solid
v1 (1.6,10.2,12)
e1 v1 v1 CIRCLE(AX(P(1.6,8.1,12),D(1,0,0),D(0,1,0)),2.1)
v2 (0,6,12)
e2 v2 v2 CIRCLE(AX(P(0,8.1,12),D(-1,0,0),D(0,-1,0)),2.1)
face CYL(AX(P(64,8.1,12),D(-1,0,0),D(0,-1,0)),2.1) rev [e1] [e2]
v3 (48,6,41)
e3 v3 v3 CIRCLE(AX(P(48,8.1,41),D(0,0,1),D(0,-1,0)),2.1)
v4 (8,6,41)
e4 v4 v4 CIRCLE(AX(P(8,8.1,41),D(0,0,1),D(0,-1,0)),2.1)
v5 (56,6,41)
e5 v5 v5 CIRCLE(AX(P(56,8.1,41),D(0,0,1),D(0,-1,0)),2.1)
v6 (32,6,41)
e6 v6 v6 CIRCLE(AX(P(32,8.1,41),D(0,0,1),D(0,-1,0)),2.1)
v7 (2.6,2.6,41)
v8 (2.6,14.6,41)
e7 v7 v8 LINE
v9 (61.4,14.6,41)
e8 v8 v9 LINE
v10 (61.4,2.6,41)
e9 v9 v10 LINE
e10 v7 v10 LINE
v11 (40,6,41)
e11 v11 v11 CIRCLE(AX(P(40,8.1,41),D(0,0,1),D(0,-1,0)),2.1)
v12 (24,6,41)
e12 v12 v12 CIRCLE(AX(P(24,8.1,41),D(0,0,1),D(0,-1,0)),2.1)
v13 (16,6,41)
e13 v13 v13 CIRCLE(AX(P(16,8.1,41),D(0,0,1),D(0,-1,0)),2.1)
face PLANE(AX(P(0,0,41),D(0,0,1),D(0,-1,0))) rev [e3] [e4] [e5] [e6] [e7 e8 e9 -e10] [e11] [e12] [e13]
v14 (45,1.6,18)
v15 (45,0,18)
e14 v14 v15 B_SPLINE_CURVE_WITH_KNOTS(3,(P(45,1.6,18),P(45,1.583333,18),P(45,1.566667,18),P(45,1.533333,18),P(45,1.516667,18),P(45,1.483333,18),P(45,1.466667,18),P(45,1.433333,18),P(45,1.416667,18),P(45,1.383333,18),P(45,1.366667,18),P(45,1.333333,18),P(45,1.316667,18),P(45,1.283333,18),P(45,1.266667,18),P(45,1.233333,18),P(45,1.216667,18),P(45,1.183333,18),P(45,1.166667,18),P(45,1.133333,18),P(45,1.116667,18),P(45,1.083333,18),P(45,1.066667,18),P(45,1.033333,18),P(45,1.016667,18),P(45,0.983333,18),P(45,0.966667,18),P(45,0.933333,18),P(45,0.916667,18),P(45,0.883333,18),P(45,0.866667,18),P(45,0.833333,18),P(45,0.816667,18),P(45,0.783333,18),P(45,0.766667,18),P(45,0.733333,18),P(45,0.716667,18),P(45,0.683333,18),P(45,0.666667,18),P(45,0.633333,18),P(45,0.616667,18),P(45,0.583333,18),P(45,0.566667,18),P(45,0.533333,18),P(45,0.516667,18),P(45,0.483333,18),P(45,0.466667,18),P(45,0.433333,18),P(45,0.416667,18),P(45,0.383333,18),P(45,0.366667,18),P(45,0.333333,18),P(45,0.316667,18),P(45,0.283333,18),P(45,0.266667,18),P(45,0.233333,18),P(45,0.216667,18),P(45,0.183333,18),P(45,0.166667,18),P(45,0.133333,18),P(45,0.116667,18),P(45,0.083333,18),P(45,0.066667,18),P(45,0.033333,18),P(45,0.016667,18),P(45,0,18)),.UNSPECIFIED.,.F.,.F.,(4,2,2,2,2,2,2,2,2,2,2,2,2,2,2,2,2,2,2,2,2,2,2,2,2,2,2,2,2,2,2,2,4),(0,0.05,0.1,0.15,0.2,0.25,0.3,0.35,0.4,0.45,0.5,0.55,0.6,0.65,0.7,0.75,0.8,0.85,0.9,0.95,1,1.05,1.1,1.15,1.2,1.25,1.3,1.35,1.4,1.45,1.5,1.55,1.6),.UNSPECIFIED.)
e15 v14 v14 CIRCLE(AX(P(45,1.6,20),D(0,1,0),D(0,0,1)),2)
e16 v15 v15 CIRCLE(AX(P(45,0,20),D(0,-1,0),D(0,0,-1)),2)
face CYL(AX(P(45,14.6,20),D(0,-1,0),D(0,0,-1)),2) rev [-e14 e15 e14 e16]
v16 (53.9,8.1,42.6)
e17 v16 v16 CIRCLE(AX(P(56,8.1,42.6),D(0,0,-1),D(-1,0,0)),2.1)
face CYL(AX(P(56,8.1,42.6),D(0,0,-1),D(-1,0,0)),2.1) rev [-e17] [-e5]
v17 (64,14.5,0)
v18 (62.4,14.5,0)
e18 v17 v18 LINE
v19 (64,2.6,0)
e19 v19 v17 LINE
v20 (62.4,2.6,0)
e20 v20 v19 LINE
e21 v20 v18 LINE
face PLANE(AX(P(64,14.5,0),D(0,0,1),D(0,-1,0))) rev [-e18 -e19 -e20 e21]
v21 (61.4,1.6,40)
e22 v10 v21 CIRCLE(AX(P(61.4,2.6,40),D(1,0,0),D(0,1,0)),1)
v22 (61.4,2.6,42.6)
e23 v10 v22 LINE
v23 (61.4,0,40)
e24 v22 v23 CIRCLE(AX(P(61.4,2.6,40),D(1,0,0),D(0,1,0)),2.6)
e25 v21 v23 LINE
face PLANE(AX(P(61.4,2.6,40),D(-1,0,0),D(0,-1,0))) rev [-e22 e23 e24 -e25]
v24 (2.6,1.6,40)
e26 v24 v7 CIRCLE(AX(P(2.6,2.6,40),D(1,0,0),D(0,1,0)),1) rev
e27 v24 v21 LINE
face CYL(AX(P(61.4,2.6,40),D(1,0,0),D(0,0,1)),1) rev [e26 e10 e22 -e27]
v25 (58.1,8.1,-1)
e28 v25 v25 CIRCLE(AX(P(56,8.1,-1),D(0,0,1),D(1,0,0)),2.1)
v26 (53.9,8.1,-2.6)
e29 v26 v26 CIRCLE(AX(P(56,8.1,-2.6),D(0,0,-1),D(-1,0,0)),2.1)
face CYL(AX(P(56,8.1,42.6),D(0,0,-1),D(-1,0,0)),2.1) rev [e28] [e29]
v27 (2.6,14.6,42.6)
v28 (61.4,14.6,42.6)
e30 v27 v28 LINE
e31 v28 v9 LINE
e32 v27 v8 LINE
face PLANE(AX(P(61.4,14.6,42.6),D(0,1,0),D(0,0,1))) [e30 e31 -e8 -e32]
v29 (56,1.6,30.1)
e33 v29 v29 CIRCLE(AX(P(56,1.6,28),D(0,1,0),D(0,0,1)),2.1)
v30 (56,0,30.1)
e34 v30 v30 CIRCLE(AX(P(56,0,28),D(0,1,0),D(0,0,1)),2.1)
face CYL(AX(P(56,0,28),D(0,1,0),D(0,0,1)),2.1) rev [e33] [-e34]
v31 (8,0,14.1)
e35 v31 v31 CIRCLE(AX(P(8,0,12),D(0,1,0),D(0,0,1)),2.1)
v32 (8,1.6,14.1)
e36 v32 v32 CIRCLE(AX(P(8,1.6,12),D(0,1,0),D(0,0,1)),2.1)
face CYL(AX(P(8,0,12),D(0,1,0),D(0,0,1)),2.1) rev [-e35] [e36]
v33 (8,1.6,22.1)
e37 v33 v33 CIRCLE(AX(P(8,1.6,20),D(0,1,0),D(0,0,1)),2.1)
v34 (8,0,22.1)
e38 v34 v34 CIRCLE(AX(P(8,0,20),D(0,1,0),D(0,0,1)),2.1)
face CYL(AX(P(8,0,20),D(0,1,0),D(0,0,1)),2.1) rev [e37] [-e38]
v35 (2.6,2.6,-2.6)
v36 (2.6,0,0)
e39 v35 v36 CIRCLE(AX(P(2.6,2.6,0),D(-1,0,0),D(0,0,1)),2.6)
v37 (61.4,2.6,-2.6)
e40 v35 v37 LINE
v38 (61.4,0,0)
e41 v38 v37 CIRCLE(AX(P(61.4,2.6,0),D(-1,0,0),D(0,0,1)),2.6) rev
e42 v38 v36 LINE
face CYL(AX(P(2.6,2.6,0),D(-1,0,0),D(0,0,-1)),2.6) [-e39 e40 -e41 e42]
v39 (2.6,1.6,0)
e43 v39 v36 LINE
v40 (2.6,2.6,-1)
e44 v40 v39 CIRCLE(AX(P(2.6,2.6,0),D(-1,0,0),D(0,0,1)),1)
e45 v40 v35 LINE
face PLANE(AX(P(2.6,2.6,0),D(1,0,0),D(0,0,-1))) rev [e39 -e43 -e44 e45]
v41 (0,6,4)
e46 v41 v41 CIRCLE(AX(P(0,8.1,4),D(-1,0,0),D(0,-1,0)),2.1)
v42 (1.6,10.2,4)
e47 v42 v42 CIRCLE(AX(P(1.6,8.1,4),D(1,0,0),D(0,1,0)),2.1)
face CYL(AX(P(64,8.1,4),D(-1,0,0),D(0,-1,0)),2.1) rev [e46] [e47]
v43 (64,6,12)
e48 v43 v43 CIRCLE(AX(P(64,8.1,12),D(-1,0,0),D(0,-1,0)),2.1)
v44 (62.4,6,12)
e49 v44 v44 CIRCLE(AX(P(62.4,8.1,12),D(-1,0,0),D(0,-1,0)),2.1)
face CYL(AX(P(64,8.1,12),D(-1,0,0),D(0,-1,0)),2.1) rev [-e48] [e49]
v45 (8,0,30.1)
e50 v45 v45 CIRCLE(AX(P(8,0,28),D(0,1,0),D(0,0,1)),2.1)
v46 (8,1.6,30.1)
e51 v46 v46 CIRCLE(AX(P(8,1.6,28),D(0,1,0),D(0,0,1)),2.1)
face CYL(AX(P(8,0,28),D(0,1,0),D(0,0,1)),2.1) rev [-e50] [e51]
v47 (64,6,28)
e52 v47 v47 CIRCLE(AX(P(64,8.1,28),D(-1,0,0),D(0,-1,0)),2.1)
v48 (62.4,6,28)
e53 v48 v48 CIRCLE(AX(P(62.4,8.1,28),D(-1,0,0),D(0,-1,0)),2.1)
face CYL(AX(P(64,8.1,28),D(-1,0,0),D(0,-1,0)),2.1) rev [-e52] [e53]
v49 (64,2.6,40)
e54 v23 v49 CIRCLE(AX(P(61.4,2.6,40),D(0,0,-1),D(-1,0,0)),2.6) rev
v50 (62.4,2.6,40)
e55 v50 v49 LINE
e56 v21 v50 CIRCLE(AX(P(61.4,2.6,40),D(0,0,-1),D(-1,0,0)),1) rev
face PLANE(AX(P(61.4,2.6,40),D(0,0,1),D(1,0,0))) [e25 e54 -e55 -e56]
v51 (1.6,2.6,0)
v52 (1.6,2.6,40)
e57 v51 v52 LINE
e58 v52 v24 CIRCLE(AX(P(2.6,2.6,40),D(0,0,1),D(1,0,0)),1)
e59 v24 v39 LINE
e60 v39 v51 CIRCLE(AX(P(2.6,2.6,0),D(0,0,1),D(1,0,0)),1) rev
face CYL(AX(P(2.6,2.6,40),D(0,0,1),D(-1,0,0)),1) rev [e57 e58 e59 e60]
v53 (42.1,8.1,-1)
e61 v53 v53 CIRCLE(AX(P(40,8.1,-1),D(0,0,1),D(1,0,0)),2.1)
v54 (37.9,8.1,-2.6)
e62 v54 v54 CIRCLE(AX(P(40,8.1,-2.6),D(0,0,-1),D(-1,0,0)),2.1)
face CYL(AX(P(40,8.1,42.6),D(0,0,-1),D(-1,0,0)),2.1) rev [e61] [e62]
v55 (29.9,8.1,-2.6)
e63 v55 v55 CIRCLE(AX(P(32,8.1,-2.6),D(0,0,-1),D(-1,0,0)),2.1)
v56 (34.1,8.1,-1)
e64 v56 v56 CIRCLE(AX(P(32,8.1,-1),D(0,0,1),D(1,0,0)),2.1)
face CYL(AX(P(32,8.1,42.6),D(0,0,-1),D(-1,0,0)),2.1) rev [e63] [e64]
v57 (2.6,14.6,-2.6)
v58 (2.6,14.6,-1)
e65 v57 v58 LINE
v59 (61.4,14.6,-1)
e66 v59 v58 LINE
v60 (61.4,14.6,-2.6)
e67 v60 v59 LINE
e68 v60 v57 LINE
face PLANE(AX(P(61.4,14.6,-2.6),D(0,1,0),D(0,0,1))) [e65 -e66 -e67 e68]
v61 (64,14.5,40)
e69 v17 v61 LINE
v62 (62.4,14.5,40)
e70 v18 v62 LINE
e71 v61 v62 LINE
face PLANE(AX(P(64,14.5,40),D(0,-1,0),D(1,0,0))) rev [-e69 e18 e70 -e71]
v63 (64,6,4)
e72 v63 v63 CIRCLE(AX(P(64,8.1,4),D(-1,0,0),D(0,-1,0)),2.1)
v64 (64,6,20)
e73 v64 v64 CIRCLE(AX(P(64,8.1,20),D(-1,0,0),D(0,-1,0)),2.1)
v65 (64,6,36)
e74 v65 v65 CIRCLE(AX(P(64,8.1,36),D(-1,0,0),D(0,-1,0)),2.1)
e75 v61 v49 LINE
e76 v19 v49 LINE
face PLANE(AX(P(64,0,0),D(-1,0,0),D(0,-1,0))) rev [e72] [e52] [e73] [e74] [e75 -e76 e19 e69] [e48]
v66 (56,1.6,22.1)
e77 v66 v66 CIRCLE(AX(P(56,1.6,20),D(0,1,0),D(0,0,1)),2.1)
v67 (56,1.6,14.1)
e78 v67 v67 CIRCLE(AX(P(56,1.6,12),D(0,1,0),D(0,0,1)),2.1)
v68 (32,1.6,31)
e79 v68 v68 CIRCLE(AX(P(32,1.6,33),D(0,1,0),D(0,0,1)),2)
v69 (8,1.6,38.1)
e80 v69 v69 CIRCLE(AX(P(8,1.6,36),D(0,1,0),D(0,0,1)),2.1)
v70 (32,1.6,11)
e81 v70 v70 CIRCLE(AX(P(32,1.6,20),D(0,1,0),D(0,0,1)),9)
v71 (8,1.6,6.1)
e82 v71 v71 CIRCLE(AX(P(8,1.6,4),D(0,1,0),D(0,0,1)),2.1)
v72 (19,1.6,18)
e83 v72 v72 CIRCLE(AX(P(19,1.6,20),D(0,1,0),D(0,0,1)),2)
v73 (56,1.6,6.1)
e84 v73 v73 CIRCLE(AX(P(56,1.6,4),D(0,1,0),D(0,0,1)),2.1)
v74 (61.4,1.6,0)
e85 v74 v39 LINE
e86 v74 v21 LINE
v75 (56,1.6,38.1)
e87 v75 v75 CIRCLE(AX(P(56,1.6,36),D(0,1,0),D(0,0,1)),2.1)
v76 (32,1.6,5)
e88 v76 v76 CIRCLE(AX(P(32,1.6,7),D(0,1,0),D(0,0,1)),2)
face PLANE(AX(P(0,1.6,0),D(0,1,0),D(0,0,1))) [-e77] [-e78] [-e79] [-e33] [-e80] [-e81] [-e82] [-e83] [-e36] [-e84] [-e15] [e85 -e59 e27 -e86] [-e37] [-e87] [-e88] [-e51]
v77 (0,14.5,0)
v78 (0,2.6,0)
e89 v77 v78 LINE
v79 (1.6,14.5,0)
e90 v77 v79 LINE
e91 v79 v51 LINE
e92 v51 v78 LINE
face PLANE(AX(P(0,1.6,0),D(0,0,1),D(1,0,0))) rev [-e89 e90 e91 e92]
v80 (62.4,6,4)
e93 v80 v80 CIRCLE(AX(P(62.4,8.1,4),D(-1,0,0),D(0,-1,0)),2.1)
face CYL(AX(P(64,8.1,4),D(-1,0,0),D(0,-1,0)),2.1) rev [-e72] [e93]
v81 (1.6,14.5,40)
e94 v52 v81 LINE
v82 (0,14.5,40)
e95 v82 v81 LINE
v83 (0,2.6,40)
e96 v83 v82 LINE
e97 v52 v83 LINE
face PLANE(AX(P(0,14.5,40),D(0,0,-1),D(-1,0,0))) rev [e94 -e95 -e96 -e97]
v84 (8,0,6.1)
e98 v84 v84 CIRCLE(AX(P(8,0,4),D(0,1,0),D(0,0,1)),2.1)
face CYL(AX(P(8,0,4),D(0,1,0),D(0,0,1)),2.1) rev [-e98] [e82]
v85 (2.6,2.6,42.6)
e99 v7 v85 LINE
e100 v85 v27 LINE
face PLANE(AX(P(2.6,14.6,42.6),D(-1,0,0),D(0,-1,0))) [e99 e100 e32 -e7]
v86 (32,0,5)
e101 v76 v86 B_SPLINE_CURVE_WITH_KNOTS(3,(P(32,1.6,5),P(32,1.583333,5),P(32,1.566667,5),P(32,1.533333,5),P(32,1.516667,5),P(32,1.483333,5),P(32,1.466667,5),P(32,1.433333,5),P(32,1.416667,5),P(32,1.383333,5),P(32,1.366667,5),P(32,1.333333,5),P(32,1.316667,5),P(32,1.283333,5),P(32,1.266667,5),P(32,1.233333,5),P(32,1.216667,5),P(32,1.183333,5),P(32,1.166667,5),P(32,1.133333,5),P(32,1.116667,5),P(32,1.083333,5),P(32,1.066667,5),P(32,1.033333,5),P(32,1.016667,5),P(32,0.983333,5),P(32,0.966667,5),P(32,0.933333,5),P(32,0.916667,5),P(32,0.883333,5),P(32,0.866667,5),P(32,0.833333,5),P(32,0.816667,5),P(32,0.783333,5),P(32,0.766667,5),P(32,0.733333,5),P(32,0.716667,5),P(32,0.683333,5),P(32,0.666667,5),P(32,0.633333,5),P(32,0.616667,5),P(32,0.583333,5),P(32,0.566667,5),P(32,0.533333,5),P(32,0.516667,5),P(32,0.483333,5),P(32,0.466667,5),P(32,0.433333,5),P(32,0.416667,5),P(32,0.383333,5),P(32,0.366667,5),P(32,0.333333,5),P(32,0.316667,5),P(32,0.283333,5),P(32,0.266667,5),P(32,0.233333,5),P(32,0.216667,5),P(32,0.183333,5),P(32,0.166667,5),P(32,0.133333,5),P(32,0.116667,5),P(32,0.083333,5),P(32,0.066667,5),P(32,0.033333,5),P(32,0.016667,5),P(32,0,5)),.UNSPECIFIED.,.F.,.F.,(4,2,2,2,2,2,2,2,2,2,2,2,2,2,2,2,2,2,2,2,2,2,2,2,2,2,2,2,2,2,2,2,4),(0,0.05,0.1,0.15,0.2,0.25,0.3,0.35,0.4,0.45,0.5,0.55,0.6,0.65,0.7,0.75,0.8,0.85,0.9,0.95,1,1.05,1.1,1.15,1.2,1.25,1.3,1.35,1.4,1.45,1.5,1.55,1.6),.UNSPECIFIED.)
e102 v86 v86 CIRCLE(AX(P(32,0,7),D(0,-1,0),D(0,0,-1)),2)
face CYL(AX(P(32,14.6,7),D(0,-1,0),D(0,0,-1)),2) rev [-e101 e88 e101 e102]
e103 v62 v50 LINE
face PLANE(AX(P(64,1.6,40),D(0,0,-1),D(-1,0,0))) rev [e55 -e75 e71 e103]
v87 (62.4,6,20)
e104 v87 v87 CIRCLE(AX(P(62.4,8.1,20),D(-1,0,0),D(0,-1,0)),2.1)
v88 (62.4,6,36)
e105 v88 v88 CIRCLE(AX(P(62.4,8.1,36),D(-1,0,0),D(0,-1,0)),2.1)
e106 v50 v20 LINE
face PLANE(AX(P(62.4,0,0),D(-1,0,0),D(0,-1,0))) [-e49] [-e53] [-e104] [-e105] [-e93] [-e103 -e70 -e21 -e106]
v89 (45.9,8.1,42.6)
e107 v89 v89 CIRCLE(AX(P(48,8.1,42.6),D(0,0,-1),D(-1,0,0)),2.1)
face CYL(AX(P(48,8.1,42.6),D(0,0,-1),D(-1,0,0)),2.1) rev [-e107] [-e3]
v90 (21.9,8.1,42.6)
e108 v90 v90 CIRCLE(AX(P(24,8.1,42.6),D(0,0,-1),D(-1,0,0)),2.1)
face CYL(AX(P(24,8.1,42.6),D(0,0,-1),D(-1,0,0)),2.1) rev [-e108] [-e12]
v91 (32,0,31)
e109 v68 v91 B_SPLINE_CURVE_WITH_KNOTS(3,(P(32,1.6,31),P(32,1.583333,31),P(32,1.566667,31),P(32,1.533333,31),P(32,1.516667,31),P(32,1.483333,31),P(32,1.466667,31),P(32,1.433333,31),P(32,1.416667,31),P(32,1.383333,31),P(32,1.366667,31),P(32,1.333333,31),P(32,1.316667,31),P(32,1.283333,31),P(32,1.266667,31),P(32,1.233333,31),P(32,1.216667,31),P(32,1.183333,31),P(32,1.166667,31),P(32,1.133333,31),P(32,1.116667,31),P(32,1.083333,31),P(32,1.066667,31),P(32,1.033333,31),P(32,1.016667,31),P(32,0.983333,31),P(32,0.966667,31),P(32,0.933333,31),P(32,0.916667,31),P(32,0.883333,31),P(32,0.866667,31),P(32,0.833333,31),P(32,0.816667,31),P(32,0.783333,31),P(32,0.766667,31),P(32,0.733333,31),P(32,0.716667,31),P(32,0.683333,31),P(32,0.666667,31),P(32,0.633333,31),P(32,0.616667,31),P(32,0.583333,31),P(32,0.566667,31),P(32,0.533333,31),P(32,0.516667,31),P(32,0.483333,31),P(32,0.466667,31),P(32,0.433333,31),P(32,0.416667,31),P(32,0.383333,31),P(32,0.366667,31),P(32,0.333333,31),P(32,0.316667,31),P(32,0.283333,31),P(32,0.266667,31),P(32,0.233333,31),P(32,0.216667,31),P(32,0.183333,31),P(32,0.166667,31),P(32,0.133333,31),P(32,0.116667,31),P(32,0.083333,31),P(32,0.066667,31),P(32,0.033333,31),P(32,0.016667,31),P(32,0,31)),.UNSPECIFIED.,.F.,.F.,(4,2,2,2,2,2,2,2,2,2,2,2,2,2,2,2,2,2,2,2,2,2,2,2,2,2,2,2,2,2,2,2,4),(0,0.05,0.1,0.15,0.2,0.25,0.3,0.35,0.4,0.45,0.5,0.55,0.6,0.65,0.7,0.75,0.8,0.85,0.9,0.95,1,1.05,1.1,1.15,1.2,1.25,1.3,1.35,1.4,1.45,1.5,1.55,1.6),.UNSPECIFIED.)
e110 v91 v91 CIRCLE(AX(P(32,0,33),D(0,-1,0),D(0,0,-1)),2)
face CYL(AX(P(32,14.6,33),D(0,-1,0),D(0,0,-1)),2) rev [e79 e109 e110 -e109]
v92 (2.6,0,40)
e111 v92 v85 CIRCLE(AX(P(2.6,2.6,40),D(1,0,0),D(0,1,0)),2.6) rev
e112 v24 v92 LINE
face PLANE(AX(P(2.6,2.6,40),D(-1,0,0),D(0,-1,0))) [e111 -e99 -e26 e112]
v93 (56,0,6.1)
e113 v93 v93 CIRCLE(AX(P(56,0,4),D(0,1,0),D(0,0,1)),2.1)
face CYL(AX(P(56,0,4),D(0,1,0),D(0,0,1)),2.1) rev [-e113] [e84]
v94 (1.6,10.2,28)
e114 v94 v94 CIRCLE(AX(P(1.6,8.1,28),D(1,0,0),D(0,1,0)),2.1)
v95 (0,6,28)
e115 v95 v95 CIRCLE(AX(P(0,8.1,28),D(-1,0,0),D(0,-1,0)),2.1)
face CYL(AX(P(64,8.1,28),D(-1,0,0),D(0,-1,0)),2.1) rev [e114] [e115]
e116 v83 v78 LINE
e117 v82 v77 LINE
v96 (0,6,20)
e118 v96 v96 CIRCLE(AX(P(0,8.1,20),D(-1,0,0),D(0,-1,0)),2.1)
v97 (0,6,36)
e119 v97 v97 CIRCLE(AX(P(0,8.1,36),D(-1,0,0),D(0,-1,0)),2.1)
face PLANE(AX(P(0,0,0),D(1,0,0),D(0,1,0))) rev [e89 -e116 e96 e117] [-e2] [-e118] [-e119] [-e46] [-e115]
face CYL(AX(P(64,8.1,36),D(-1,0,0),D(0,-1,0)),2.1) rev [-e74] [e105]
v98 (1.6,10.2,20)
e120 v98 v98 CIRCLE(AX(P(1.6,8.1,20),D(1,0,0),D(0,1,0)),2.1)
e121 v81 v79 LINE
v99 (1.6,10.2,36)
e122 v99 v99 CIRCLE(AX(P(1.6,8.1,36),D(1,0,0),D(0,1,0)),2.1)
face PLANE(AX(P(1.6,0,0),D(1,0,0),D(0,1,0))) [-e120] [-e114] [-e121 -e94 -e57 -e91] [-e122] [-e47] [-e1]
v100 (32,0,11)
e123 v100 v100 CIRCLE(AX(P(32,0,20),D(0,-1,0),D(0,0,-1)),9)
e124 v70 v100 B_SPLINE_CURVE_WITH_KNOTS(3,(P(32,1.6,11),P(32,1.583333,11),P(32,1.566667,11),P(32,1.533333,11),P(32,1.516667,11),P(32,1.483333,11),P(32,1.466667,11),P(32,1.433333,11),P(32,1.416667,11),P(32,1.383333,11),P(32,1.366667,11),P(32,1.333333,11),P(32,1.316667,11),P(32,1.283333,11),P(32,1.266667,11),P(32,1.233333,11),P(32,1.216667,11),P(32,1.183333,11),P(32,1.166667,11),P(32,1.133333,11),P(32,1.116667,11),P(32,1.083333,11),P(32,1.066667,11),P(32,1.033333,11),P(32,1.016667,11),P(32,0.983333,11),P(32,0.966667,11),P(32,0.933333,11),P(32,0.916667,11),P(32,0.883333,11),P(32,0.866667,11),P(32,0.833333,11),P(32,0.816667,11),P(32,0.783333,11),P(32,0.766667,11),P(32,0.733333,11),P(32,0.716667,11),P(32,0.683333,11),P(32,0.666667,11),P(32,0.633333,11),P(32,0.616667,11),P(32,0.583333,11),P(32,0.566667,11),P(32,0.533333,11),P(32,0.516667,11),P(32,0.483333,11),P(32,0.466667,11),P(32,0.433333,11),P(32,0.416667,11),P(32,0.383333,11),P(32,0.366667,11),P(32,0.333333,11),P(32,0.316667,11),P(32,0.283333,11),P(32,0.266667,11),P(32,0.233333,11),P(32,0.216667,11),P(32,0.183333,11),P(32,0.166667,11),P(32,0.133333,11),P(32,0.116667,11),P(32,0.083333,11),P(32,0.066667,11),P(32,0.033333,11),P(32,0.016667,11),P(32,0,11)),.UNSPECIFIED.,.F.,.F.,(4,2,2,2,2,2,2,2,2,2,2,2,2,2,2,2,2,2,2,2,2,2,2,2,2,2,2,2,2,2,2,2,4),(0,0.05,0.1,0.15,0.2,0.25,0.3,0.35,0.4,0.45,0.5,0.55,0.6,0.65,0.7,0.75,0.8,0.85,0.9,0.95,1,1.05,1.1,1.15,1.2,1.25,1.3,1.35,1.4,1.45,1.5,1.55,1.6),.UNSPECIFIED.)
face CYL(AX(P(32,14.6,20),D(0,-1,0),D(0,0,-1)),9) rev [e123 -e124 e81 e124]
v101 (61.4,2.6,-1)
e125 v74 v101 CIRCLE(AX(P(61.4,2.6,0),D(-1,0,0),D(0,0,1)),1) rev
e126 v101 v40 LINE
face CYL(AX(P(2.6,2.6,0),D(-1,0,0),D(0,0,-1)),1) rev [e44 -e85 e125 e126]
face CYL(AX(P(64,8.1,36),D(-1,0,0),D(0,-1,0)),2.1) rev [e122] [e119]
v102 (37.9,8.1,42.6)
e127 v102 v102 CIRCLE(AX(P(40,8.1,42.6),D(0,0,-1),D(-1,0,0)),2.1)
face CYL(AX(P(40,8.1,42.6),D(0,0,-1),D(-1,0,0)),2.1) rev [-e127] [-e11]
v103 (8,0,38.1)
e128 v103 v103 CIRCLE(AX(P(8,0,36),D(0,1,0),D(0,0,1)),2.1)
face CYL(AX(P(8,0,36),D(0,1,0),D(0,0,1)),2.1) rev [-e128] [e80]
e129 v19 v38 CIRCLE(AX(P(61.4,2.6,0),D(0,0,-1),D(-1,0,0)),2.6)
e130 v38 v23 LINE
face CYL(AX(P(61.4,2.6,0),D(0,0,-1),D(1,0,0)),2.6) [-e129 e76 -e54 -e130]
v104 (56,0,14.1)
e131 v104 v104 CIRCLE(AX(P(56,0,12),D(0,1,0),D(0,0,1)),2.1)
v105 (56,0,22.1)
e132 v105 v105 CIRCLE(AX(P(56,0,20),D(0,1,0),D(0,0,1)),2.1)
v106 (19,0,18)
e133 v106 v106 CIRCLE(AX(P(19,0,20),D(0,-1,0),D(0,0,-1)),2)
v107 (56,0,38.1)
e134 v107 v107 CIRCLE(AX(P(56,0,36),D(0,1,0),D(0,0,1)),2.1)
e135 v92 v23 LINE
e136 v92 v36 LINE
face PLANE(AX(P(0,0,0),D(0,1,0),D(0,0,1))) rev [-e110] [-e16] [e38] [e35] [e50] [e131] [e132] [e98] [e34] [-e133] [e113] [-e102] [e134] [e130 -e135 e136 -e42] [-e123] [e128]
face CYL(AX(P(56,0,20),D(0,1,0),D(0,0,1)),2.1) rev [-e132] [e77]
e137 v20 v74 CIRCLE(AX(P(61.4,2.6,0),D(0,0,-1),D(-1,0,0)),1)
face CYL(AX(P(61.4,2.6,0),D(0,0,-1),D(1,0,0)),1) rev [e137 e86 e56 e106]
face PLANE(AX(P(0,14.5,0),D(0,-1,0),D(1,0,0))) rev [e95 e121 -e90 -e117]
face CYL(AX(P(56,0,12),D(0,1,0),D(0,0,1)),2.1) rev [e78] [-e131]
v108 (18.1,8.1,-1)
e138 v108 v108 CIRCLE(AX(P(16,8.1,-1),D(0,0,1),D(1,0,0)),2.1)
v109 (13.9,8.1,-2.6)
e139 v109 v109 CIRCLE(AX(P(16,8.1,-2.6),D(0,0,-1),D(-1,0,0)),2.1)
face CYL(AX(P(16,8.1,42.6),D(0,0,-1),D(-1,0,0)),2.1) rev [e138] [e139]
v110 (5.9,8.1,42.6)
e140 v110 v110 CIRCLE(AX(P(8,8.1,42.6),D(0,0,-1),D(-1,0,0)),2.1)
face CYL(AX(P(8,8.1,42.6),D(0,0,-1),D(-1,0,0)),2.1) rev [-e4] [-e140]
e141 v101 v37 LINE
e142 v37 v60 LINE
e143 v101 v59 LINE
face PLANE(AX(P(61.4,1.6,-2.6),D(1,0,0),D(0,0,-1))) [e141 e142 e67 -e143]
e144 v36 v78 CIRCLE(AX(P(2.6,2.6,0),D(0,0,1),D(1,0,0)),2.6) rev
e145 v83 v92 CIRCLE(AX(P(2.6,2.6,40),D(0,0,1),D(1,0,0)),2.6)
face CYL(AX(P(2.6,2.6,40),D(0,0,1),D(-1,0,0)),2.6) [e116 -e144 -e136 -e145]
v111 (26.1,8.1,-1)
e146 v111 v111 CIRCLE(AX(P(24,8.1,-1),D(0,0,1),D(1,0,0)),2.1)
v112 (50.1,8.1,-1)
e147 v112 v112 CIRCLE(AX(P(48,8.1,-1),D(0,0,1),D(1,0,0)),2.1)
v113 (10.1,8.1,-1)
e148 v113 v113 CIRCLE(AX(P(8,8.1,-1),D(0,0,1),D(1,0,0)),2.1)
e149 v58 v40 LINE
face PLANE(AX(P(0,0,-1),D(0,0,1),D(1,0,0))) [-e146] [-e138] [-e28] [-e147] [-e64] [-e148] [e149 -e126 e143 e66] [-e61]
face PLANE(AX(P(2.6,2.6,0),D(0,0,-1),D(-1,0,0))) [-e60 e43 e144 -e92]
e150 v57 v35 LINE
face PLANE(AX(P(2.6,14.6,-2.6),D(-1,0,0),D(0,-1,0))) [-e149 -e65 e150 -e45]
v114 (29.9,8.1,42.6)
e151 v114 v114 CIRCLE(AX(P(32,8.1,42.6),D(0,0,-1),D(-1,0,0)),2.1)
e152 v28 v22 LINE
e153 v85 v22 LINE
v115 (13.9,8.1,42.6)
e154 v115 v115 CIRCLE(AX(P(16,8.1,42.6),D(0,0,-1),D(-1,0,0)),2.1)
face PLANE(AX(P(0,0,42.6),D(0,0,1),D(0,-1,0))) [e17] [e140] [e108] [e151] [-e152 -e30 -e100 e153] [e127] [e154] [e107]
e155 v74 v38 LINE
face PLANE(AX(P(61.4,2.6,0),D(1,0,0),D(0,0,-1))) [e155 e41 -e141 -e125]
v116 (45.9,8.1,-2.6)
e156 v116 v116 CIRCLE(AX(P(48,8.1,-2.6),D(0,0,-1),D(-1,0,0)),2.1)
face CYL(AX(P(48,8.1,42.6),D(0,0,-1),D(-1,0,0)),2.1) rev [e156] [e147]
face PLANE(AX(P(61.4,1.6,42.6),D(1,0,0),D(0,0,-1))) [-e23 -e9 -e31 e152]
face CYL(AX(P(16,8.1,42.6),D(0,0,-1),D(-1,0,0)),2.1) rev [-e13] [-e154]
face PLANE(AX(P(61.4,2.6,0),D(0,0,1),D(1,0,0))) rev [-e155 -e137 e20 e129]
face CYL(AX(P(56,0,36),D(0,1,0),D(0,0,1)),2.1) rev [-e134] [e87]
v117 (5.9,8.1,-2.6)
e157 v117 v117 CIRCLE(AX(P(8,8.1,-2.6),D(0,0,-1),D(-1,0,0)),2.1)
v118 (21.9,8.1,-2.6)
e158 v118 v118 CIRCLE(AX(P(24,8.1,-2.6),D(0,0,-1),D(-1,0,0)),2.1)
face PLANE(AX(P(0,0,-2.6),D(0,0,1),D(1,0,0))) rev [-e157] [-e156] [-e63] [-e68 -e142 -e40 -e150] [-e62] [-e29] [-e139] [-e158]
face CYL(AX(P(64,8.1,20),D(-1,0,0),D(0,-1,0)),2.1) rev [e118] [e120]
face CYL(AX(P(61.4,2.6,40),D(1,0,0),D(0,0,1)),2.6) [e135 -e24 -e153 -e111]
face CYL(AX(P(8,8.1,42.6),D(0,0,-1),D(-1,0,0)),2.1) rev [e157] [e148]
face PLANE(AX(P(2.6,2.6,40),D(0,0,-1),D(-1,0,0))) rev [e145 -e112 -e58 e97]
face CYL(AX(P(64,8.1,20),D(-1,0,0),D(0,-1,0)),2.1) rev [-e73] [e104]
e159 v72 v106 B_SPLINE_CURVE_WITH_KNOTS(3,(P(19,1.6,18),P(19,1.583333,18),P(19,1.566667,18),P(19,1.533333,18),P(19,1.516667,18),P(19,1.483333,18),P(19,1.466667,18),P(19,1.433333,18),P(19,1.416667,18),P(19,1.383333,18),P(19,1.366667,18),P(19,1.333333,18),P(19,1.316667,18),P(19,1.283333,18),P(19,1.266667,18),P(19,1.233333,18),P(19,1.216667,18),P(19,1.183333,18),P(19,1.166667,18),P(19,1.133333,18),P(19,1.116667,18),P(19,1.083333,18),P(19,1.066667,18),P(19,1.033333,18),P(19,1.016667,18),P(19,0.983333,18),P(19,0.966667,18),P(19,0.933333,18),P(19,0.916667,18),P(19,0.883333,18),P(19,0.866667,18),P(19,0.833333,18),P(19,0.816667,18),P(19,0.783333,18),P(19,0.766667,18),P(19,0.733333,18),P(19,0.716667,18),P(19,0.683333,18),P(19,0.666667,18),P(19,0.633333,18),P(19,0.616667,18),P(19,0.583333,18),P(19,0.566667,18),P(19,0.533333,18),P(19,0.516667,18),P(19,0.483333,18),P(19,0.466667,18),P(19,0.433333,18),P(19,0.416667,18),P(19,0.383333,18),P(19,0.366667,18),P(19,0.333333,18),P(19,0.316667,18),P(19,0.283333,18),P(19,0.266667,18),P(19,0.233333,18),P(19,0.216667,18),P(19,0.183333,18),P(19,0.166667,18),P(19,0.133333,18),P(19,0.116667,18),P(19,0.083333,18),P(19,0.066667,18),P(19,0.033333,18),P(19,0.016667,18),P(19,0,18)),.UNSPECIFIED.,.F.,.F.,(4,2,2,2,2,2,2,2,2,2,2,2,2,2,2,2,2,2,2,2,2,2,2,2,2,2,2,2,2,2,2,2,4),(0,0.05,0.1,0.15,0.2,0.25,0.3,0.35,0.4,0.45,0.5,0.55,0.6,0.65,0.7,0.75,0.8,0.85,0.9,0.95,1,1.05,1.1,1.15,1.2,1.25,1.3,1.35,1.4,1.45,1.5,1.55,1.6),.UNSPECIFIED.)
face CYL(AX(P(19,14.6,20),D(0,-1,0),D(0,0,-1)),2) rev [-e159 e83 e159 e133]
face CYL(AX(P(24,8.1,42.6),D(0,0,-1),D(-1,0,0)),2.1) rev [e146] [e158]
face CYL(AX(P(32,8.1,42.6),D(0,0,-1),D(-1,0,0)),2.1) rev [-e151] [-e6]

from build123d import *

# Parameters (mm, degrees)
SKETCH1_W                      = 64
SKETCH1_H                      = 40
BOSS_EXTRUDE1_DEPTH            = 1.6
SKETCH2_R                      = 2.1
CUT_EXTRUDE1_DEPTH             = 76.488807117
LPATTERN1_COUNT                = 2
LPATTERN1_PITCH                = 48
LPATTERN1_COUNT_DIR2           = 5
LPATTERN1_PITCH_DIR2           = 8
EDGE_FLANGE1_STRIP_W           = 8.4
EDGE_FLANGE1_STRIP_H           = 1.6
EDGE_FLANGE1_STRIP_CUT_DEPTH   = 40
EDGE_FLANGE1_STRIP_2_W         = 8.4
EDGE_FLANGE1_STRIP_2_H         = 1.6
EDGE_FLANGE1_STRIP_CUT_2_DEPTH = 40
EDGE_FLANGE1_DEPTH             = 40
EDGE_FLANGE1_BEND_DEPTH        = 40
SKETCH14_R                     = 2.1
CUT_EXTRUDE2_DEPTH             = 77.852130745
LPATTERN2_COUNT                = 5
LPATTERN2_PITCH                = 8
EDGE_FLANGE2_DEPTH             = 58.8
EDGE_FLANGE2_BEND_DEPTH        = 58.8
SKETCH25_R                     = 2.1
CUT_EXTRUDE3_DEPTH             = 80.700690085
LPATTERN3_COUNT                = 7
LPATTERN3_PITCH                = 8
SKETCH26_R                     = 9
SKETCH26_R_2                   = 2
CUT_EXTRUDE4_DEPTH             = 79.255479041


# Sheet-metal steps are written as plain solids
with BuildPart() as part:
    # Sketch1 → Boss-Extrude1 (new body)
    with BuildSketch(Plane(origin=(0, 0, 0), x_dir=(1, 0, 0), z_dir=(0, 1, 0))):
        with Locations((32, -20)):
            Rectangle(SKETCH1_W, SKETCH1_H)
    extrude(amount=BOSS_EXTRUDE1_DEPTH)

    # Sketch2 → Cut-Extrude1 (cut, through all)
    with BuildSketch(Plane(origin=(0, 1.6, 0), x_dir=(1, 0, 0), z_dir=(0, 1, 0))):
        with Locations(Location((8, -4, 0), (0, 0, 270))):
            Circle(SKETCH2_R)
    cut_extrude1 = extrude(amount=-CUT_EXTRUDE1_DEPTH, mode=Mode.SUBTRACT)

    # LPattern1: Cut-Extrude1 2 × 5
    with Locations(*[(i * LPATTERN1_PITCH, 0, j * LPATTERN1_PITCH_DIR2) for i in range(LPATTERN1_COUNT) for j in range(LPATTERN1_COUNT_DIR2) if (i, j) != (0, 0)]):
        add(cut_extrude1, mode=Mode.SUBTRACT)

    # Edge-Flange1 strip (across the edge) → Edge-Flange1 strip cut (cut)
    with BuildSketch(Plane(origin=(64, 1.6, 40), x_dir=(-1, 0, 0), z_dir=(0, 0, -1))):
        with Locations((-1.6, -0.8)):
            Rectangle(EDGE_FLANGE1_STRIP_W, EDGE_FLANGE1_STRIP_H)
    extrude(amount=EDGE_FLANGE1_STRIP_CUT_DEPTH, mode=Mode.SUBTRACT)

    # Edge-Flange1 strip 2 (across the edge) → Edge-Flange1 strip cut 2 (cut)
    with BuildSketch(Plane(origin=(0, 1.6, 0), x_dir=(1, 0, 0), z_dir=(0, 0, 1))):
        with Locations((-1.6, -0.8)):
            Rectangle(EDGE_FLANGE1_STRIP_2_W, EDGE_FLANGE1_STRIP_2_H)
    extrude(amount=EDGE_FLANGE1_STRIP_CUT_2_DEPTH, mode=Mode.SUBTRACT)

    # Edge-Flange1 section (across the edge) → Edge-Flange1 (add)
    with BuildSketch(Plane(origin=(64, 1.6, 40), x_dir=(-1, 0, 0), z_dir=(0, 0, -1))):
        with BuildLine():
            Line((0, 1), (0, 12.9))
            Line((0, 12.9), (1.6, 12.9))
            Line((1.6, 12.9), (1.6, 1))
            ThreePointArc((1.6, 1), (1.892893219, 0.292893219), (2.6, 0))
            Line((2.6, 0), (2.6, -1.6))
            ThreePointArc((2.6, -1.6), (0.761522369, -0.838477631), (0, 1))
        make_face()
    extrude(amount=EDGE_FLANGE1_DEPTH)

    # Edge-Flange1 section 2 (across the edge) → Edge-Flange1 bend (add)
    with BuildSketch(Plane(origin=(0, 1.6, 0), x_dir=(1, 0, 0), z_dir=(0, 0, 1))):
        with BuildLine():
            Line((0, 1), (0, 12.9))
            Line((0, 12.9), (1.6, 12.9))
            Line((1.6, 12.9), (1.6, 1))
            ThreePointArc((1.6, 1), (1.892893219, 0.292893219), (2.6, 0))
            Line((2.6, 0), (2.6, -1.6))
            ThreePointArc((2.6, -1.6), (0.761522369, -0.838477631), (0, 1))
        make_face()
    extrude(amount=EDGE_FLANGE1_BEND_DEPTH)

    # Sketch14 → Cut-Extrude2 (cut, through all)
    with BuildSketch(Plane.ZY):
        with Locations(Location((4, 8.1, 0), (0, 0, 270))):
            Circle(SKETCH14_R)
    cut_extrude2 = extrude(amount=-CUT_EXTRUDE2_DEPTH, mode=Mode.SUBTRACT)

    # LPattern2: Cut-Extrude2 ×5
    with Locations(*[(0, 0, i * LPATTERN2_PITCH) for i in range(1, LPATTERN2_COUNT)]):
        add(cut_extrude2, mode=Mode.SUBTRACT)

    # Edge-Flange2 section (across the edge) → Edge-Flange2 (add)
    with BuildSketch(Plane(origin=(2.6, 1.6, 41), x_dir=(0, 0, -1), z_dir=(1, 0, 0))):
        with BuildLine():
            Line((-1.6, 1), (-1.6, 13))
            Line((-1.6, 13), (0, 13))
            Line((0, 13), (0, 1))
            ThreePointArc((0, 1), (0.292893219, 0.292893219), (1, 0))
            Line((1, 0), (1, -1.6))
            ThreePointArc((1, -1.6), (-0.838477631, -0.838477631), (-1.6, 1))
        make_face()
    extrude(amount=EDGE_FLANGE2_DEPTH)

    # Edge-Flange2 section 2 (across the edge) → Edge-Flange2 bend (add)
    with BuildSketch(Plane(origin=(61.4, 1.6, -1), x_dir=(0, 0, 1), z_dir=(-1, 0, 0))):
        with BuildLine():
            Line((-1.6, 1), (-1.6, 13))
            Line((-1.6, 13), (0, 13))
            Line((0, 13), (0, 1))
            ThreePointArc((0, 1), (0.292893219, 0.292893219), (1, 0))
            Line((1, 0), (1, -1.6))
            ThreePointArc((1, -1.6), (-0.838477631, -0.838477631), (-1.6, 1))
        make_face()
    extrude(amount=EDGE_FLANGE2_BEND_DEPTH)

    # Sketch25 → Cut-Extrude3 (cut, through all)
    with BuildSketch(Plane(origin=(0, 0, -2.6), x_dir=(-1, 0, 0), z_dir=(0, 0, -1))):
        with Locations((-8, 8.1)):
            Circle(SKETCH25_R)
    cut_extrude3 = extrude(amount=-CUT_EXTRUDE3_DEPTH, mode=Mode.SUBTRACT)

    # LPattern3: Cut-Extrude3 ×7
    with Locations(*[(i * LPATTERN3_PITCH, 0, 0) for i in range(1, LPATTERN3_COUNT)]):
        add(cut_extrude3, mode=Mode.SUBTRACT)

    # Sketch26 → Cut-Extrude4 (cut, through all)
    with BuildSketch(Plane.XZ):
        with Locations(Location((32, 20, 0), (0, 0, 270))):
            Circle(SKETCH26_R)
        with Locations(Location((45, 20, 0), (0, 0, 270))):
            Circle(SKETCH26_R_2)
        with Locations(Location((32, 7, 0), (0, 0, 270))):
            Circle(SKETCH26_R_2)
        with Locations(Location((19, 20, 0), (0, 0, 270))):
            Circle(SKETCH26_R_2)
        with Locations(Location((32, 33, 0), (0, 0, 270))):
            Circle(SKETCH26_R_2)
    extrude(amount=-CUT_EXTRUDE4_DEPTH, mode=Mode.SUBTRACT)


solid = part.part
